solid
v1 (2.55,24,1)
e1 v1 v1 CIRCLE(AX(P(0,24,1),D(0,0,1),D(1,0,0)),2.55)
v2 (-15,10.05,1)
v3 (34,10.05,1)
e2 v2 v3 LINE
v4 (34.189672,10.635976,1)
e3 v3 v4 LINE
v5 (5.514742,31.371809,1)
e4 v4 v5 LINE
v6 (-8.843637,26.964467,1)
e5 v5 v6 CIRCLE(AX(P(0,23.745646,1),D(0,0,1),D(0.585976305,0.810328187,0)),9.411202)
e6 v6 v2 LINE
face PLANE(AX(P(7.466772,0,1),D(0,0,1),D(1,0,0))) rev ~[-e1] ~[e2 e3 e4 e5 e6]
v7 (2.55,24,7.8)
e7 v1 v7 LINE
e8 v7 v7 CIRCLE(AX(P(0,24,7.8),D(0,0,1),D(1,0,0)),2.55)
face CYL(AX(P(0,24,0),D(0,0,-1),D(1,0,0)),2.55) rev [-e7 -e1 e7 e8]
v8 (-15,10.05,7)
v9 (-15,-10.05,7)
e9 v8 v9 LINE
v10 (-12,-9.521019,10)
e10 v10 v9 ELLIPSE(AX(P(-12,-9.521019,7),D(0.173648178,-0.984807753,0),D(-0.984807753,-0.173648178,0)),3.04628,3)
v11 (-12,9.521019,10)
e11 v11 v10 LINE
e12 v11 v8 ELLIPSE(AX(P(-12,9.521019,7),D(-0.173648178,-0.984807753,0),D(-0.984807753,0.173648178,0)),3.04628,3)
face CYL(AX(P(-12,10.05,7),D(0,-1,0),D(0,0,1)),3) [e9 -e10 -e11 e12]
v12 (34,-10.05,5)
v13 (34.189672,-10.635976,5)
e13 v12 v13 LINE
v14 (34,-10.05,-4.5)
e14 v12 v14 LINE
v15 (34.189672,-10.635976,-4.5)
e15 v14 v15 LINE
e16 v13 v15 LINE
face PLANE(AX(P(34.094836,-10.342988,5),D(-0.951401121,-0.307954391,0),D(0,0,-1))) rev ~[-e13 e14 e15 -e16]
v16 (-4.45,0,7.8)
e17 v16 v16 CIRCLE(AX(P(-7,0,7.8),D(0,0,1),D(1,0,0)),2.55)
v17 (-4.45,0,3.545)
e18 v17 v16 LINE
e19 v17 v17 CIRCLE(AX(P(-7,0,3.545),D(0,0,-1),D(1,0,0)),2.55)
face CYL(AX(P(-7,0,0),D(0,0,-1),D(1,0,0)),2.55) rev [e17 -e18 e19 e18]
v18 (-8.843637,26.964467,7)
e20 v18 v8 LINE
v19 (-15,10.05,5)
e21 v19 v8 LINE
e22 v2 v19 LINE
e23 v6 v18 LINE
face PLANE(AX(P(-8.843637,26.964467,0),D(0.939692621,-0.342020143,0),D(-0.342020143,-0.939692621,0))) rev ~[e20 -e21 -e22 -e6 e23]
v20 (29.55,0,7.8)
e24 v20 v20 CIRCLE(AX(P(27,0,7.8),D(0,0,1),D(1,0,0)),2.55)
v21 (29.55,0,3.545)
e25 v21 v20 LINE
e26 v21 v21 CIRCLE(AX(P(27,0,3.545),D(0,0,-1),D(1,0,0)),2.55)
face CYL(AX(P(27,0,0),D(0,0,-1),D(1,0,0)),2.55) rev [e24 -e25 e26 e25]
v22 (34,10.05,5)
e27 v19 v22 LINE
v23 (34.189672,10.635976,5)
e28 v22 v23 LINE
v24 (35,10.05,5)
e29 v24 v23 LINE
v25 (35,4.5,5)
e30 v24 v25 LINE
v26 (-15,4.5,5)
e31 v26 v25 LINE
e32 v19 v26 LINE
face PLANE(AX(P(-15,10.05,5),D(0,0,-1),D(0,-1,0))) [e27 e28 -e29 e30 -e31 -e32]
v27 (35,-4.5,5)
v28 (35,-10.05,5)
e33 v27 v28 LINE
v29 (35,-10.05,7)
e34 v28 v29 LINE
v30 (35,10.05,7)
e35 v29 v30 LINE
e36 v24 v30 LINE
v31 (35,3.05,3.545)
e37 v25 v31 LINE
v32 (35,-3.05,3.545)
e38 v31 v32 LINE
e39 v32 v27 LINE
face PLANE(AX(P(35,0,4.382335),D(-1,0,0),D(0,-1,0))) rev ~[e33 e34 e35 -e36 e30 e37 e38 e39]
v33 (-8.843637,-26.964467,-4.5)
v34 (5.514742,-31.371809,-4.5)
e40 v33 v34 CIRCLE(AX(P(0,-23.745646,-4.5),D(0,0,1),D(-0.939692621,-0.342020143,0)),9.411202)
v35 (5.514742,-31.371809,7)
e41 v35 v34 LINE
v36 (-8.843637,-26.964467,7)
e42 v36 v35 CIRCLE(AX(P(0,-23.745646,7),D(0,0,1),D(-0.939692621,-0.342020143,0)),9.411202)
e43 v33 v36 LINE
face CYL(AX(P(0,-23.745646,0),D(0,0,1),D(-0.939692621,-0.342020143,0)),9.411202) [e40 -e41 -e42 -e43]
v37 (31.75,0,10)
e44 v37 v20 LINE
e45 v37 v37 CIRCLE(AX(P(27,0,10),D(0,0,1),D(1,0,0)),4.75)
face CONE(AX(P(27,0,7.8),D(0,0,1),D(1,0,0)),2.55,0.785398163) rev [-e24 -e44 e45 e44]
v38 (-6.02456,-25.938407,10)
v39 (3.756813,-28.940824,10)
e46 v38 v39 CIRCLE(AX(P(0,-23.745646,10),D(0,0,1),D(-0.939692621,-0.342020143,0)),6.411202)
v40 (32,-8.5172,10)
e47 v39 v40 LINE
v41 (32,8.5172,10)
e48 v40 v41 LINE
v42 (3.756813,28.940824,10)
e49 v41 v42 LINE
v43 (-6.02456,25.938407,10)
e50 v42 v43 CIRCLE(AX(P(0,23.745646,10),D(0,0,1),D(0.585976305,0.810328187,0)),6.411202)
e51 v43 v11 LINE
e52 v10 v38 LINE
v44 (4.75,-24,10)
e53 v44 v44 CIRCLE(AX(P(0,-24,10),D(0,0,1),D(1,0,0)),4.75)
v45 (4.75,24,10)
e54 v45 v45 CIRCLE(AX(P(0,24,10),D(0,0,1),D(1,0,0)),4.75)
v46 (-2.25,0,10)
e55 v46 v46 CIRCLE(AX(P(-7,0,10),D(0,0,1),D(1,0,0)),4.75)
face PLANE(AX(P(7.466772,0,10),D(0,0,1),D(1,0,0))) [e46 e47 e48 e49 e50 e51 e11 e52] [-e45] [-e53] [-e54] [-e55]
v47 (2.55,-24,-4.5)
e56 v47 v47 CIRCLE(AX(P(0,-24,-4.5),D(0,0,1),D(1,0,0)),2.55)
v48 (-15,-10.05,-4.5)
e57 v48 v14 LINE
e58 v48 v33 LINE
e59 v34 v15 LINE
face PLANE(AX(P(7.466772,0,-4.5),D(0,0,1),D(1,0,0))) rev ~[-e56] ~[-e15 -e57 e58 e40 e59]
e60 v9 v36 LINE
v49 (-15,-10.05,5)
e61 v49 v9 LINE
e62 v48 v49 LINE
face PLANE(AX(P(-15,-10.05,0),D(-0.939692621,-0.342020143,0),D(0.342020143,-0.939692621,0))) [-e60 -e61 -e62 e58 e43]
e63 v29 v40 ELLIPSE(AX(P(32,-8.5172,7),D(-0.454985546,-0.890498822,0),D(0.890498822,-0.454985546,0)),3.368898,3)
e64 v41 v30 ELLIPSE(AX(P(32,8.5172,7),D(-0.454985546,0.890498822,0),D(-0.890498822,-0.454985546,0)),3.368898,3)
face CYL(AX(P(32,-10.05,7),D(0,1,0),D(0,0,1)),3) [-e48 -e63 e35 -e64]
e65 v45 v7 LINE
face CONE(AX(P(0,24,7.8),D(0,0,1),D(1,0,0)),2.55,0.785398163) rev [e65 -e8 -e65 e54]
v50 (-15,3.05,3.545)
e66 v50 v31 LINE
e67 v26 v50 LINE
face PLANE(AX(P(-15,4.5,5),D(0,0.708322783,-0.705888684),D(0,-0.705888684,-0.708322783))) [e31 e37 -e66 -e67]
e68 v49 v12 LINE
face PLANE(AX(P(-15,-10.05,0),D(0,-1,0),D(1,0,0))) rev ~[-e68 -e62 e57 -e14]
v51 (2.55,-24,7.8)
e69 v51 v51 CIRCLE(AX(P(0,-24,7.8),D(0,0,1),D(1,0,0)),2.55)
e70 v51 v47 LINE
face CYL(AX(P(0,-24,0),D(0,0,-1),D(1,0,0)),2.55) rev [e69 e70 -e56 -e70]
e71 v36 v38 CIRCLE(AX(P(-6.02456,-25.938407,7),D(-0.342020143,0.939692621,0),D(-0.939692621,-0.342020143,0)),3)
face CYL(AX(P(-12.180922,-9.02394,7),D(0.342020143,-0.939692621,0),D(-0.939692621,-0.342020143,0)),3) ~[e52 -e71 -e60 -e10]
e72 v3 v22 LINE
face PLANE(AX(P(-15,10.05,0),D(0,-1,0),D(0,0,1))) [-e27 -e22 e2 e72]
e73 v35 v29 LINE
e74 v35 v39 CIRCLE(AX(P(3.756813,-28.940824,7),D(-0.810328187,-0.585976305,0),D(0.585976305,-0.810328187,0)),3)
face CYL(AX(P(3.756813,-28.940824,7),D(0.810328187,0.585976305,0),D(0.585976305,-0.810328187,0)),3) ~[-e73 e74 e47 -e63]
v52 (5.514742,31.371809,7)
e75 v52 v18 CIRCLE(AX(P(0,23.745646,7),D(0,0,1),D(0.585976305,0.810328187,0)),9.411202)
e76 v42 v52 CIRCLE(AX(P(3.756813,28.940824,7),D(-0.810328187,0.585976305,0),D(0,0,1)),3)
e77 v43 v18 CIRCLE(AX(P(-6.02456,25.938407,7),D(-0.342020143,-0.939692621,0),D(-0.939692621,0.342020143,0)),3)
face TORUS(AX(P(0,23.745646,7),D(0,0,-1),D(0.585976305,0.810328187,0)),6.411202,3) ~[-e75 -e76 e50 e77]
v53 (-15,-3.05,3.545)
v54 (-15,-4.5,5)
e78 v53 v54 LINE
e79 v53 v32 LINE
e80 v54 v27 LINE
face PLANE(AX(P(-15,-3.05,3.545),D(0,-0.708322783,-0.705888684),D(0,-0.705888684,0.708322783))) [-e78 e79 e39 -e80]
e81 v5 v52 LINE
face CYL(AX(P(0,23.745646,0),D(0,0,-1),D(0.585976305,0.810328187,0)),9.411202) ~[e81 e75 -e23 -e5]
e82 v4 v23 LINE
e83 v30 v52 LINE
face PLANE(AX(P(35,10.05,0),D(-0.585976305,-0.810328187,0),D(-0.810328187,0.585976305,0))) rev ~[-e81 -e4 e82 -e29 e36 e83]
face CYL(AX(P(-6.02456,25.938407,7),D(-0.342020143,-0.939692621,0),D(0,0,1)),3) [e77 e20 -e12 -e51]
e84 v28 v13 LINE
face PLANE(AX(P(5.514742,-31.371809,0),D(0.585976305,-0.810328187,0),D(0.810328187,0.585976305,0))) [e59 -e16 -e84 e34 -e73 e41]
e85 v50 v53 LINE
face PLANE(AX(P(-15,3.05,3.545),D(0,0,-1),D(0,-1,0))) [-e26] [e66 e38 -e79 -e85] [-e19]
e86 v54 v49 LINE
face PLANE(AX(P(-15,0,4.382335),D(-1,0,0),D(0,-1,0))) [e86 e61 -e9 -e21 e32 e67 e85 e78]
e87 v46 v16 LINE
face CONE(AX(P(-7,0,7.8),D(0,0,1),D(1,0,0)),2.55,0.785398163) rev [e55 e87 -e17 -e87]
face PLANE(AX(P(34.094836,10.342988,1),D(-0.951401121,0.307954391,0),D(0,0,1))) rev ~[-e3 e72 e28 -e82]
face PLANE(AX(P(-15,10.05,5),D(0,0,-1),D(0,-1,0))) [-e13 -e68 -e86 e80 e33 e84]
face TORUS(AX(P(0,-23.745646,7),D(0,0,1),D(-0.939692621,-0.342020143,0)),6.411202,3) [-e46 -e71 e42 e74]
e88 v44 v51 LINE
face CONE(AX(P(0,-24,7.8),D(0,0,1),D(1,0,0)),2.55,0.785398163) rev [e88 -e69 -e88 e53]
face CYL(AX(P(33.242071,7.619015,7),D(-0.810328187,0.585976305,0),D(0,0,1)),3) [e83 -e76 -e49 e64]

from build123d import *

# Parameters (mm, degrees)
F0_R     = 2.55
F1_DEPTH = 10
F2_W     = 20.1
F2_H     = 5
F3_DEPTH = 50.001
F5_DEPTH = 50
F6_DEPTH = 10
F7_DEPTH = 4.5
F8_DEPTH = 1
F9_R     = 3
F10_SIZE = 2.2
F11_SIZE = 1


# Not quite as in the source:
# - a feature names something its author has since deleted; it is built from what else it names


with BuildPart() as f1:
    # F0 (on Top) → F1 (new body)
    with BuildSketch(Plane.XY):
        with BuildLine():
            Line((-8.8436374201, 26.9644671741), (-15, 10.05))
            Line((-15, 10.05), (-15, -10.05))
            Line((-15, -10.05), (-8.8436374201, -26.9644671741))
            ThreePointArc((-8.8436374201, -26.9644671741), (-2.7616213035, -32.7425446245), (5.5147415904, -31.3718089411))
            Line((5.5147415904, -31.3718089411), (35, -10.05))
            Line((35, -10.05), (35, 10.05))
            Line((35, 10.05), (5.5147415904, 31.3718089411))
            ThreePointArc((5.5147415904, 31.3718089411), (-2.7616213035, 32.7425446245), (-8.8436374201, 26.9644671741))
        make_face()
        with Locations((0, -24)):
            Circle(F0_R, mode=Mode.SUBTRACT)
        with Locations((-7, 0)):
            Circle(F0_R, mode=Mode.SUBTRACT)
        with Locations((0, 24)):
            Circle(F0_R, mode=Mode.SUBTRACT)
        with Locations((27, 0)):
            Circle(F0_R, mode=Mode.SUBTRACT)
    extrude(amount=F1_DEPTH)

    # F2 (on face) → F3 (cut, through all)
    with BuildSketch(Plane(origin=(-15, 0, 0), x_dir=(0, -1, 0), z_dir=(-1, 0, 0))):
        with Locations((0, 2.5)):
            Rectangle(F2_W, F2_H)
    extrude(amount=-F3_DEPTH, mode=Mode.SUBTRACT)

    # F4 (on face) → F5 (join, through all)
    with BuildSketch(Plane(origin=(-15, 0, 0), x_dir=(0, -1, 0), z_dir=(-1, 0, 0))):
        Polygon((3.05, 3.545), (4.5, 5), (-4.5, 5), (-3.05, 3.545), align=None)
    extrude(amount=-F5_DEPTH)

    # F0 (on Top) → F6 (cut, through all)
    with BuildSketch(Plane.XY):
        with Locations((-7, 0)):
            Circle(F0_R)
        with Locations((27, 0)):
            Circle(F0_R)
    extrude(amount=F6_DEPTH, mode=Mode.SUBTRACT)

    # F7 (add): a face of the model
    f7_faces = [f1.faces().sort_by_distance(p)[0] for p in [
        (5.7473624585, -18.668206632, 0),
    ]]
    extrude(f7_faces, amount=F7_DEPTH)

    # F8 (cut): a face of the model
    f8_faces = [f1.faces().sort_by_distance(p)[0] for p in [
        (5.7473624585, 18.668206632, 0),
    ]]
    extrude(f8_faces, amount=-F8_DEPTH, mode=Mode.SUBTRACT)

    # F9
    f9_edges = [f1.edges().sort_by_distance(p)[0] for p in [
        (-11.921819, 18.507234, 10),
        (-15, 0, 10),
        (-11.921819, -18.507234, 10),
        (35, 0, 10),
        (-2.761621, 32.742545, 10),
        (-2.761621, -32.742545, 10),
        (20.257371, -20.710904, 10),
        (20.257371, 20.710904, 10),
    ]]
    fillet(f9_edges, radius=F9_R)

    # F10
    f10_edges = [f1.edges().sort_by_distance(p)[0] for p in [
        (-2.55, -24, 10),
        (-9.55, 0, 10),
        (-2.55, 24, 10),
        (24.45, 0, 10),
    ]]
    chamfer(f10_edges, length=F10_SIZE)

    # F11
    f11_edges = [f1.edges().sort_by_distance(p)[0] for p in [
        (35, 10.05, 3),
        (5.514742, -31.371809, 1.25),
        (35, -10.05, 0.25),
    ]]
    chamfer(f11_edges, length=F11_SIZE)


solid = f1.part
